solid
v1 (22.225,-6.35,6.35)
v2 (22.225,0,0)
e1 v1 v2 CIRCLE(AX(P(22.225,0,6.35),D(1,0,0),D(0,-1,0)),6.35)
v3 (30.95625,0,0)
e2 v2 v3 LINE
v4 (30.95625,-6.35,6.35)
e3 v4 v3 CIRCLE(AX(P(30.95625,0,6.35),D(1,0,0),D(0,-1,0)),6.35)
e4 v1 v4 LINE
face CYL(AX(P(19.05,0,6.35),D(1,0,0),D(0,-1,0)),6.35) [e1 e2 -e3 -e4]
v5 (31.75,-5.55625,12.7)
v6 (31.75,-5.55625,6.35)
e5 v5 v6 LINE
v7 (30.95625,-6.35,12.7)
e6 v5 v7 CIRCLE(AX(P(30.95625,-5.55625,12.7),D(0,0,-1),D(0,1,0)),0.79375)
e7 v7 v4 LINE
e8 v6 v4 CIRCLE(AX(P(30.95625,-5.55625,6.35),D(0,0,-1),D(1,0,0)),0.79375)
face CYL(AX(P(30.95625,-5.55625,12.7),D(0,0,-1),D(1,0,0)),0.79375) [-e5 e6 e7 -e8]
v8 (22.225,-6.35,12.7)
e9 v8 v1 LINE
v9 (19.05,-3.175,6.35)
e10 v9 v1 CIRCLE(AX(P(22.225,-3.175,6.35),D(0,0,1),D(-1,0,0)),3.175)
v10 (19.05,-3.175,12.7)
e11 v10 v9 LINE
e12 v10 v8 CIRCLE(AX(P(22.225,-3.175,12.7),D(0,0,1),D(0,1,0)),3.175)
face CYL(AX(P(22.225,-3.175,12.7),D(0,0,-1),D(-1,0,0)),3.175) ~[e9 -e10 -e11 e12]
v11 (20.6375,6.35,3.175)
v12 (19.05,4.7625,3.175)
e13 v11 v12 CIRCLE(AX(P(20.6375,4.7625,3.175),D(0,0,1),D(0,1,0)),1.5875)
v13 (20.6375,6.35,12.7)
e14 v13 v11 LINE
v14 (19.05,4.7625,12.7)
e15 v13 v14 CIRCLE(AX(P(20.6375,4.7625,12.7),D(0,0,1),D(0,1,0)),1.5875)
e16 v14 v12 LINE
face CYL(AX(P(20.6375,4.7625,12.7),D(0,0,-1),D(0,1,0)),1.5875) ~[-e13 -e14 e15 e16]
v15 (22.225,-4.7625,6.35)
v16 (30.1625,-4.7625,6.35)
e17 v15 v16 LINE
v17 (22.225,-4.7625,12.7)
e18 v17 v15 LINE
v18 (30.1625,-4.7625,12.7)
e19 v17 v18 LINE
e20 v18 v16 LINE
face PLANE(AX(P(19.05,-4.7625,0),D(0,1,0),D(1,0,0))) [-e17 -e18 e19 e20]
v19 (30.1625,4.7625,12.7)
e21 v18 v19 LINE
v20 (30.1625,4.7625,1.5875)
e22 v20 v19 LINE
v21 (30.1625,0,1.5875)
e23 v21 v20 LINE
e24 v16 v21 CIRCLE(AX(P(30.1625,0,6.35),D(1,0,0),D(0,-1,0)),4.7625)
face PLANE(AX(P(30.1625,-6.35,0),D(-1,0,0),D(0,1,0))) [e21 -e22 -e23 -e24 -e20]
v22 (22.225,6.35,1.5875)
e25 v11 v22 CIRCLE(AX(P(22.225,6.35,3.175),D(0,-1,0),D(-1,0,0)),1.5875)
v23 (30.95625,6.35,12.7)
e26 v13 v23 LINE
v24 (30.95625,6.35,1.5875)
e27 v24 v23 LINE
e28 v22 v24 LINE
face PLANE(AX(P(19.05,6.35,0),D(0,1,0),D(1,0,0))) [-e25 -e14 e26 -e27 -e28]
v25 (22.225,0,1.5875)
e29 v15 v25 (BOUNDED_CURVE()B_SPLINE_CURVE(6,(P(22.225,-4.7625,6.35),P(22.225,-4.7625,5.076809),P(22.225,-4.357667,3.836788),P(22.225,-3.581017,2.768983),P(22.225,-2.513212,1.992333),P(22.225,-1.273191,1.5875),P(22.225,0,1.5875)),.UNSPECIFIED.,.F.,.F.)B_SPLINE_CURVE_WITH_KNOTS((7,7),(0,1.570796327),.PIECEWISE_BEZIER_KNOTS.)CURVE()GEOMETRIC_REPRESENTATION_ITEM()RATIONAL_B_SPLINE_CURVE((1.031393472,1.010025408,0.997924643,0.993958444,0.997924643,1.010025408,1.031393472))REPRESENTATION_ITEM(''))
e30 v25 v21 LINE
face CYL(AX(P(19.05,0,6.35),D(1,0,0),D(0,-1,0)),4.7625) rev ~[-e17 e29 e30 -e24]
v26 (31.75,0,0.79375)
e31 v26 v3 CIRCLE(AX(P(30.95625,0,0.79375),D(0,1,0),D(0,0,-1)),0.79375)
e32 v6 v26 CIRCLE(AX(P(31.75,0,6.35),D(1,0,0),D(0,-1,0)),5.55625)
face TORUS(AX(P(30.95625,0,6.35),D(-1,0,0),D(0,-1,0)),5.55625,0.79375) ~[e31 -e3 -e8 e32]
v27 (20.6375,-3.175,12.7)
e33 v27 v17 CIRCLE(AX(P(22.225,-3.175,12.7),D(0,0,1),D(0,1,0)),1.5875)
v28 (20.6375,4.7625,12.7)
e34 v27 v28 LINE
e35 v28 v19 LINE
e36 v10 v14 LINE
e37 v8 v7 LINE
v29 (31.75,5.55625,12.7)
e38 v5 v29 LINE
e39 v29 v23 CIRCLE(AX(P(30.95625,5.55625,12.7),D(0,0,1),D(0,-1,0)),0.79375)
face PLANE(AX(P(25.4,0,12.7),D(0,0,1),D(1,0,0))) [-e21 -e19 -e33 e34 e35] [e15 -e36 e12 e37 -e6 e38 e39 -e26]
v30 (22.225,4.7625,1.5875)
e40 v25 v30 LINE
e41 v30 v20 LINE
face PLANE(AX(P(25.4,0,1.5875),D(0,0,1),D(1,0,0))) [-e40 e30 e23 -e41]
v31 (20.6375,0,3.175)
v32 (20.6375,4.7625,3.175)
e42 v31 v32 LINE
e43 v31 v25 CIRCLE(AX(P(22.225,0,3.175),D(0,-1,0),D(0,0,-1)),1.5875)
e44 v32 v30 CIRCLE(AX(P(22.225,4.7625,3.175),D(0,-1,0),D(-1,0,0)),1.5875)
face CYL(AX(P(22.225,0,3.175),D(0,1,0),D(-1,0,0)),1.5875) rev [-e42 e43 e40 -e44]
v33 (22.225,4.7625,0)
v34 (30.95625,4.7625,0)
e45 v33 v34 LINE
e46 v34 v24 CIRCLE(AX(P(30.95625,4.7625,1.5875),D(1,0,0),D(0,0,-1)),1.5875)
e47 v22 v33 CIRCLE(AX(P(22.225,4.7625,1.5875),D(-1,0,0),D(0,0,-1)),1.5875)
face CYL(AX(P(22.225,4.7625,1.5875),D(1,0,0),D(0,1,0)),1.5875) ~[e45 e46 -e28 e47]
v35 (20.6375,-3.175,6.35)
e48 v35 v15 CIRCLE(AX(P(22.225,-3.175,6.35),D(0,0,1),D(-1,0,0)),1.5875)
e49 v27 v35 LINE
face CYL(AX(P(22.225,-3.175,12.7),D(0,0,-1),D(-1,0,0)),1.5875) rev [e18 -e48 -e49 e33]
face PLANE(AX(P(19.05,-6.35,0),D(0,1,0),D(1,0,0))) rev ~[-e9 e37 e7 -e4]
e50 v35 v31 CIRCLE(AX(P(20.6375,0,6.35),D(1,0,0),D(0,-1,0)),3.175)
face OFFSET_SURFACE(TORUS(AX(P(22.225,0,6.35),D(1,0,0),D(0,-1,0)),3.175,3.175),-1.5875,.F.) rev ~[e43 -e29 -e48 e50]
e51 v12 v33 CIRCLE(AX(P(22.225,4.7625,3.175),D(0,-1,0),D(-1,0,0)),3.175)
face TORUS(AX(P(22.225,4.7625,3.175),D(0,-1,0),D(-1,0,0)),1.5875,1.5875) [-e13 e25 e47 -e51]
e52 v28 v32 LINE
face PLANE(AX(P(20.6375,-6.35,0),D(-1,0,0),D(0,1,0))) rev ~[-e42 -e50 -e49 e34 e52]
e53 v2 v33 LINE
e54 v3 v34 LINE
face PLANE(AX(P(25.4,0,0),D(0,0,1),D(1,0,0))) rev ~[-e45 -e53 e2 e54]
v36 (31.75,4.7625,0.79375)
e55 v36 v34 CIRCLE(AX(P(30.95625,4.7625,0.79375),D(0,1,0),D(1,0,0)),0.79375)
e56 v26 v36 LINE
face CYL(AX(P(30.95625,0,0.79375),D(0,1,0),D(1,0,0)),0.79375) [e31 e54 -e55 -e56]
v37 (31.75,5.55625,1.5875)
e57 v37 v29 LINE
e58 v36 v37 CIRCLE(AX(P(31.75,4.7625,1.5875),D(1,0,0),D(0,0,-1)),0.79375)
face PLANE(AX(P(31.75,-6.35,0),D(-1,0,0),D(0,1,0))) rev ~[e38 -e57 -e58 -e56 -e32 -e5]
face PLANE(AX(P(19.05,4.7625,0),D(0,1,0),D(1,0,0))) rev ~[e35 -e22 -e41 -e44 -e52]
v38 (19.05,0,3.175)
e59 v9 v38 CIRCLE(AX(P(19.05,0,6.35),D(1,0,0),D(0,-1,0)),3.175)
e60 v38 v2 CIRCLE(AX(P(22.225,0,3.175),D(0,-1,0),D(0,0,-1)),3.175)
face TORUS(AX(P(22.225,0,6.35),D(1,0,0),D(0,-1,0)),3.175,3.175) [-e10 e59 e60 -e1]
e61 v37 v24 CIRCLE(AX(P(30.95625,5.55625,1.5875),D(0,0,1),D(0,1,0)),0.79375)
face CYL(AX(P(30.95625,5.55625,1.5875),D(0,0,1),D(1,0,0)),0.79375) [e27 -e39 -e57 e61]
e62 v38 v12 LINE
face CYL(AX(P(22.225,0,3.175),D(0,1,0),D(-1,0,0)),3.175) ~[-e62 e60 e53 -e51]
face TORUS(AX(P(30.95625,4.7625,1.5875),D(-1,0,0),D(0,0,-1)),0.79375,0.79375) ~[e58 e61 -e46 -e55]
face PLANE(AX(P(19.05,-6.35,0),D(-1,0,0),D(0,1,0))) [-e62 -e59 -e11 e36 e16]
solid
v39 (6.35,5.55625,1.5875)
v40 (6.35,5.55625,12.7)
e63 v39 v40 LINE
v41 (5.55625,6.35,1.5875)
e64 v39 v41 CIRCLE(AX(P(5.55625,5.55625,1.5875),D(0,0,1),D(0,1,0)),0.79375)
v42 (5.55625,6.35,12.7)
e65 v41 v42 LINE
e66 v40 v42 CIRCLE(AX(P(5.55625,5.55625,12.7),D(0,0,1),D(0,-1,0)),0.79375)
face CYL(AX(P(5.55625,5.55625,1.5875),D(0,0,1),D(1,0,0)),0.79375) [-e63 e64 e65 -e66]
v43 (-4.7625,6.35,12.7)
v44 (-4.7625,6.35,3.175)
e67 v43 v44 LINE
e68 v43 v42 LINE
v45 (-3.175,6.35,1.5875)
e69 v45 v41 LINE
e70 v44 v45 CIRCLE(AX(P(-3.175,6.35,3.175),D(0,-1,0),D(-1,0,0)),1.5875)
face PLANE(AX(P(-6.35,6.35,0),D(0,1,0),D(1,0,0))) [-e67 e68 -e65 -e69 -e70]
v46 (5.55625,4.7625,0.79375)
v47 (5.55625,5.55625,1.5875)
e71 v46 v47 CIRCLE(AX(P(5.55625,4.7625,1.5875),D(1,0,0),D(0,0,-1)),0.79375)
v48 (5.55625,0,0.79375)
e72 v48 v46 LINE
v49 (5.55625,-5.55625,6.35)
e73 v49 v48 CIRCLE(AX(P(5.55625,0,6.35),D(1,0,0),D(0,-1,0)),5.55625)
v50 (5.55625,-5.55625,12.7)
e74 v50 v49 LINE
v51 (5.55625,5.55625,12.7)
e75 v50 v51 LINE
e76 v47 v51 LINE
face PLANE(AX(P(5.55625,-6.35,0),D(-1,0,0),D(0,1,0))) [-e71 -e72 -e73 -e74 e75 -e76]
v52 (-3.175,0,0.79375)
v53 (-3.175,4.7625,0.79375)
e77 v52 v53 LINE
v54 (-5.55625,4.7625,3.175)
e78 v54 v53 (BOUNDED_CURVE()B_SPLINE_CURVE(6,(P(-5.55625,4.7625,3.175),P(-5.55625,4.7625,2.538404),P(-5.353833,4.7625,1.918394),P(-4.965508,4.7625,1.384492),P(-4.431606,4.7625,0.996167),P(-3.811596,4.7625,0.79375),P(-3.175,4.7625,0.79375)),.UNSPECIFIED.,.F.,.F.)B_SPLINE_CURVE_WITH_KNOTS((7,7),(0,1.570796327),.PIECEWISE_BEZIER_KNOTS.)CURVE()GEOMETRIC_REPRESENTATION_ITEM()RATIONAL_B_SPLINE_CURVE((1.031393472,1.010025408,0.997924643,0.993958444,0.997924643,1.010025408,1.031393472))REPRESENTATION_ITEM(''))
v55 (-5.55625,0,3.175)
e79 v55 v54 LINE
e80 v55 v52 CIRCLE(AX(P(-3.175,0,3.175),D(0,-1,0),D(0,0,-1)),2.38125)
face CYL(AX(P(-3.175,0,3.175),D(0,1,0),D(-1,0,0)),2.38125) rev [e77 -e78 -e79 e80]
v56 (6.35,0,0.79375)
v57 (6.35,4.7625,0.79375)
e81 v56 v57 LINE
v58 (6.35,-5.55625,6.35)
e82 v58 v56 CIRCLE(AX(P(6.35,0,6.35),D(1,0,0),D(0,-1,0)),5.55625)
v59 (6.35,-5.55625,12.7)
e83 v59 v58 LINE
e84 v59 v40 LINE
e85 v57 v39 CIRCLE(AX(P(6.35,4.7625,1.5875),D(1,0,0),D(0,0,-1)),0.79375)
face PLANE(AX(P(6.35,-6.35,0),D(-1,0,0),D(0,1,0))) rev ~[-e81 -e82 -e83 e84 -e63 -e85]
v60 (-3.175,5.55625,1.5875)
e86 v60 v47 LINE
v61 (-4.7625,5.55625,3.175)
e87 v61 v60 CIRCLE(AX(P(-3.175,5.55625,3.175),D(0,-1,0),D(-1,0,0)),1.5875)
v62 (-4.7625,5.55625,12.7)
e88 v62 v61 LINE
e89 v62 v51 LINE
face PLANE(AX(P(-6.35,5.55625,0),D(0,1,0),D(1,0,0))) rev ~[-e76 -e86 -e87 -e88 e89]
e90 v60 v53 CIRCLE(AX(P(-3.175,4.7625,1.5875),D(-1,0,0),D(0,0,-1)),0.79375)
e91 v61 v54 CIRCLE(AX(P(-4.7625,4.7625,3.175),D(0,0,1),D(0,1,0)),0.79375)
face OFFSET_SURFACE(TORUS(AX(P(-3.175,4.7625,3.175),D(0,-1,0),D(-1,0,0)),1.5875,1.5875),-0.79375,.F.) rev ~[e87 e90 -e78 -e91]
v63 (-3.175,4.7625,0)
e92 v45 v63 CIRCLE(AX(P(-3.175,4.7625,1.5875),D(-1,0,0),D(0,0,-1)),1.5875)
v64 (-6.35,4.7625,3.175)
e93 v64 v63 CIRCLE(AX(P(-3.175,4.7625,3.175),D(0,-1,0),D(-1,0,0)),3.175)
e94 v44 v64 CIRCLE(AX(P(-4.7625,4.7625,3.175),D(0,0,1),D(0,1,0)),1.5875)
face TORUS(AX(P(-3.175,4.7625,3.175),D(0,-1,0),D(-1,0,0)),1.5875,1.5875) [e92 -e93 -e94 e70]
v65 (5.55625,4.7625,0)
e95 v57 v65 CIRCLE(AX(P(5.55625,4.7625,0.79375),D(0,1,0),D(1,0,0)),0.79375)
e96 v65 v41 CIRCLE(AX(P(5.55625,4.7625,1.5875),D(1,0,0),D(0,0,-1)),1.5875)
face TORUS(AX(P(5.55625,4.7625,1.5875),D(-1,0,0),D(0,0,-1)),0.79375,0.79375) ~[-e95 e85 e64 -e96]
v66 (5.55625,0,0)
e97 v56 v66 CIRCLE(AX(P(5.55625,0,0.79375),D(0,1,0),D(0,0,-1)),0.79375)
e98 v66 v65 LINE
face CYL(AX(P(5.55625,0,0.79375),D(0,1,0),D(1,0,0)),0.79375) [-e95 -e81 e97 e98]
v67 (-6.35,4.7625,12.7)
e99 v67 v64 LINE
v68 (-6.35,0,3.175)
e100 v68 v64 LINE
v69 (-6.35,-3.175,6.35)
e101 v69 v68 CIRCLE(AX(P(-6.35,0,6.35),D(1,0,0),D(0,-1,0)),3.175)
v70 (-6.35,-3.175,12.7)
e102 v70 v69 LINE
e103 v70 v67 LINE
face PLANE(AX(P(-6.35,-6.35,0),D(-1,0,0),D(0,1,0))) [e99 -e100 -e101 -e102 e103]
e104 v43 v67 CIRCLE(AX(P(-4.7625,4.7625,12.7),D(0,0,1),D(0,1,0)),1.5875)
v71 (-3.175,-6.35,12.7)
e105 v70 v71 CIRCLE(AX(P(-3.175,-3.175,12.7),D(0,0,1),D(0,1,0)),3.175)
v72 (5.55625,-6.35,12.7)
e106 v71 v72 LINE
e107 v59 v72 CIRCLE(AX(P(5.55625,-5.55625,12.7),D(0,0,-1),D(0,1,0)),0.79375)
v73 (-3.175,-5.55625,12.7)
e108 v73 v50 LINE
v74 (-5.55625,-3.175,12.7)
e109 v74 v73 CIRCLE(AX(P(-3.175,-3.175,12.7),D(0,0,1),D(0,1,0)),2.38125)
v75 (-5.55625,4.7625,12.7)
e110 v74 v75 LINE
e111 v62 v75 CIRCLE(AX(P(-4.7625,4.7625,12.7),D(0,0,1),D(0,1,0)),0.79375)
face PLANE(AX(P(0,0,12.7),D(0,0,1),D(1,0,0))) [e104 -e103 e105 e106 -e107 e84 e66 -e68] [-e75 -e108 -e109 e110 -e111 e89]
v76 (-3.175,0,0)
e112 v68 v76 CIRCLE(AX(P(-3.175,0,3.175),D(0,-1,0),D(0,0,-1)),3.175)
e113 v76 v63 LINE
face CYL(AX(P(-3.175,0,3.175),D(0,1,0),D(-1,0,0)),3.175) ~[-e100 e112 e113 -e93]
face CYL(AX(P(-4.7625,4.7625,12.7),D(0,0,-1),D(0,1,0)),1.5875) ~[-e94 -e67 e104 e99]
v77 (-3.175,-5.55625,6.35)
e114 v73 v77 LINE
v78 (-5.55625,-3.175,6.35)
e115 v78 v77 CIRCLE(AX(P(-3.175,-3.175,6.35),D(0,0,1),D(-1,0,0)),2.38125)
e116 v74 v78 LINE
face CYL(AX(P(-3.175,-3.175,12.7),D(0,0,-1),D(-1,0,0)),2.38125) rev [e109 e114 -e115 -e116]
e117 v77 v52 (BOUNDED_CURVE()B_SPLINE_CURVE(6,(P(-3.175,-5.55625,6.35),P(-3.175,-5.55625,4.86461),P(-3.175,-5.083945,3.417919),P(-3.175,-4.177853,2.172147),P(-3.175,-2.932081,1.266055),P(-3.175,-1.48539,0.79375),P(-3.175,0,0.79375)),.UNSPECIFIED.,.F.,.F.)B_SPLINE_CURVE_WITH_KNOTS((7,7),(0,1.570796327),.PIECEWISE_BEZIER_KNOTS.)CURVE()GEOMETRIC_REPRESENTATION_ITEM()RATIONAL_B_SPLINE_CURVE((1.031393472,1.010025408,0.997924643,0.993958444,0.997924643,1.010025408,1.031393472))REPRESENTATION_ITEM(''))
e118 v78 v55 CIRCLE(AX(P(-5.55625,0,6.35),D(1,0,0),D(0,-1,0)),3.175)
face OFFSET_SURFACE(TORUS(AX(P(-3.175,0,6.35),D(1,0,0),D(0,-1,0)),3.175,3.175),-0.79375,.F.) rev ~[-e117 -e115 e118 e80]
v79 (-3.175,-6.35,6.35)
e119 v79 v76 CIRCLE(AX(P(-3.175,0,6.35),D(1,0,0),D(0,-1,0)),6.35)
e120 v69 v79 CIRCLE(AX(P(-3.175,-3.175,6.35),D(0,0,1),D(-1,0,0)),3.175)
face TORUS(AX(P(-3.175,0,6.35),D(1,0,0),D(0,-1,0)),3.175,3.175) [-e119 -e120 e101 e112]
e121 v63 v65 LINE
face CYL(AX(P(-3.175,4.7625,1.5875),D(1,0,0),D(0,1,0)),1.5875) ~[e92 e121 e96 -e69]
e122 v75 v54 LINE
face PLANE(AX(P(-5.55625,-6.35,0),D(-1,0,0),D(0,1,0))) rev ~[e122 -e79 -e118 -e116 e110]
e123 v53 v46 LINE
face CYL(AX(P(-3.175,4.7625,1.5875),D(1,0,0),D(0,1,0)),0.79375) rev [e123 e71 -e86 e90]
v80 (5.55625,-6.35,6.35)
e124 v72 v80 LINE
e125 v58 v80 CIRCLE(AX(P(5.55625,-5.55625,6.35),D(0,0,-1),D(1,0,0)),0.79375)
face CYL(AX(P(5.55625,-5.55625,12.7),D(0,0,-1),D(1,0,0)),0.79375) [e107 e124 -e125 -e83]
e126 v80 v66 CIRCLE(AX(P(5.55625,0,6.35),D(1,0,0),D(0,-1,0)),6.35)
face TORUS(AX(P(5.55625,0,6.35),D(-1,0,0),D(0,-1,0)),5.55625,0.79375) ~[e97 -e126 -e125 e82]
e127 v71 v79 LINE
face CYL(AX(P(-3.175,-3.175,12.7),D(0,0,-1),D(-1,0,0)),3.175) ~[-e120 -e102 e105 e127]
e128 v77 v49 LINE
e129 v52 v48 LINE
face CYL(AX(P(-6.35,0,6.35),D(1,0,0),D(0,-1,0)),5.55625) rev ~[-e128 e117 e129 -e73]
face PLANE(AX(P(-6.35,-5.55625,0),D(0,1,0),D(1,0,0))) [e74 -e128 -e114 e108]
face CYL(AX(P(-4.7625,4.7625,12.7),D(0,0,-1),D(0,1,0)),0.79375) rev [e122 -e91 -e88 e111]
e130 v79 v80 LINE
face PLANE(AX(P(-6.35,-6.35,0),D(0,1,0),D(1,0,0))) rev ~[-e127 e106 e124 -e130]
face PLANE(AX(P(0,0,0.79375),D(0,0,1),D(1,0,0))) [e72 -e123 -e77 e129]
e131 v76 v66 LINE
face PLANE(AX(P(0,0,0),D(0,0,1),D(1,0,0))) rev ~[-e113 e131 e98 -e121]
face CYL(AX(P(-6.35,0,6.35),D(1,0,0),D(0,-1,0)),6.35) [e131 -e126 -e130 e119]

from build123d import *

# Parameters (mm, degrees)
F0_W     = 12.7
F0_H     = 12.7
F1_DEPTH = 12.7
F2_R     = 6.35
F3_R     = 3.175
F4_R     = 1.5875
F5_R     = 0.79375
F7_T     = 0.79375
F8_T     = 1.5875


# Not quite as in the source:
# - a shell that OpenCascade refuses in one call is made with other operations: the cavity is built on its own and cut out


with BuildPart() as f1:
    # F0 (on Top) → F1 (new body)
    with BuildSketch(Plane.XY):
        Rectangle(F0_W, F0_H)
    extrude(amount=F1_DEPTH)

    # F2
    f2_edges = [f1.edges().sort_by_distance(p)[0] for p in [
        (0, -6.35, 0),
    ]]
    fillet(f2_edges, radius=F2_R)

    # F3
    f3_edges = [f1.edges().sort_by_distance(p)[0] for p in [
        (-6.35, 3.175, 0),
    ]]
    fillet(f3_edges, radius=F3_R)

    # F4
    f4_edges = [f1.edges().sort_by_distance(p)[0] for p in [
        (1.5875, 6.35, 0),
    ]]
    fillet(f4_edges, radius=F4_R)

    # F5
    f5_edges = [f1.edges().sort_by_distance(p)[0] for p in [
        (6.35, 2.38125, 0),
    ]]
    fillet(f5_edges, radius=F5_R)


with BuildPart() as f6_1:
    # F6: copy of F1
    add(f1.part.moved(Location((25.4, 0, 0))))

    # F8: shell of thickness 1.5875, made by hand


with BuildPart() as f1_1:
    add(f1.part)

    # F7: shell of thickness 0.79375, made by hand


with BuildPart() as f7_core1:
    # F7_t2: copy of F1
    add(f1_1.part)

    # the walls: a layer under each face that stays
    f7_faces = [f7_core1.faces().sort_by_distance(p)[0] for p in [
        (0.396875, 6.35, 7.14375),
        (-5.8850320151, 5.8850320151, 7.9375),
        (6.35, 0, 6.746875),
        (-6.35, 0.79375, 7.9375),
        (-5.4200640303, -5.4200640303, 9.525),
        (1.190625, -6.35, 9.525),
        (1.190625, 5.8850320151, 0.4649679849),
        (-5.0912820151, 5.8850320151, 1.2587179849),
        (-5.4200640303, 2.38125, 0.9299359697),
        (-5.4200640303, -3.8325640303, 2.5174359697),
        (1.190625, -4.4901280605, 1.8598719395),
        (1.190625, 2.38125, 0),
    ]]
    thicken(f7_faces, amount=-F7_T, mode=Mode.SUBTRACT)


with BuildPart() as f1_2:
    add(f1_1.part)

    # what is left inside the walls is the cavity
    f7_cavity = [f7_core1.part.solids().sort_by_distance(p)[0] for p in [
        (5.548312, 0, 8.73125),
    ]]
    add(f7_cavity, mode=Mode.SUBTRACT)


with BuildPart() as f8_core1:
    # F8_t2: copy of F6_1
    add(f6_1.part)

    # the walls: a layer under each face that stays
    f8_faces = [f8_core1.faces().sort_by_distance(p)[0] for p in [
        (25.796875, 6.35, 7.14375),
        (31.75, 0, 6.746875),
        (19.05, 0.79375, 7.9375),
        (19.9799359697, -5.4200640303, 9.525),
        (26.590625, -6.35, 9.525),
        (19.9799359697, 2.38125, 0.9299359697),
        (19.9799359697, -3.8325640303, 2.5174359697),
        (26.590625, -4.4901280605, 1.8598719395),
        (26.590625, 2.38125, 0),
    ]]
    thicken(f8_faces, amount=-F8_T, mode=Mode.SUBTRACT)


with BuildPart() as f6_1_1:
    add(f6_1.part)

    # what is left inside the walls is the cavity
    f8_cavity = [f8_core1.part.solids().sort_by_distance(p)[0] for p in [
        (25.4, 4.746625, 8.995833),
    ]]
    add(f8_cavity, mode=Mode.SUBTRACT)


solid = Compound([f1_2.part, f6_1_1.part])
